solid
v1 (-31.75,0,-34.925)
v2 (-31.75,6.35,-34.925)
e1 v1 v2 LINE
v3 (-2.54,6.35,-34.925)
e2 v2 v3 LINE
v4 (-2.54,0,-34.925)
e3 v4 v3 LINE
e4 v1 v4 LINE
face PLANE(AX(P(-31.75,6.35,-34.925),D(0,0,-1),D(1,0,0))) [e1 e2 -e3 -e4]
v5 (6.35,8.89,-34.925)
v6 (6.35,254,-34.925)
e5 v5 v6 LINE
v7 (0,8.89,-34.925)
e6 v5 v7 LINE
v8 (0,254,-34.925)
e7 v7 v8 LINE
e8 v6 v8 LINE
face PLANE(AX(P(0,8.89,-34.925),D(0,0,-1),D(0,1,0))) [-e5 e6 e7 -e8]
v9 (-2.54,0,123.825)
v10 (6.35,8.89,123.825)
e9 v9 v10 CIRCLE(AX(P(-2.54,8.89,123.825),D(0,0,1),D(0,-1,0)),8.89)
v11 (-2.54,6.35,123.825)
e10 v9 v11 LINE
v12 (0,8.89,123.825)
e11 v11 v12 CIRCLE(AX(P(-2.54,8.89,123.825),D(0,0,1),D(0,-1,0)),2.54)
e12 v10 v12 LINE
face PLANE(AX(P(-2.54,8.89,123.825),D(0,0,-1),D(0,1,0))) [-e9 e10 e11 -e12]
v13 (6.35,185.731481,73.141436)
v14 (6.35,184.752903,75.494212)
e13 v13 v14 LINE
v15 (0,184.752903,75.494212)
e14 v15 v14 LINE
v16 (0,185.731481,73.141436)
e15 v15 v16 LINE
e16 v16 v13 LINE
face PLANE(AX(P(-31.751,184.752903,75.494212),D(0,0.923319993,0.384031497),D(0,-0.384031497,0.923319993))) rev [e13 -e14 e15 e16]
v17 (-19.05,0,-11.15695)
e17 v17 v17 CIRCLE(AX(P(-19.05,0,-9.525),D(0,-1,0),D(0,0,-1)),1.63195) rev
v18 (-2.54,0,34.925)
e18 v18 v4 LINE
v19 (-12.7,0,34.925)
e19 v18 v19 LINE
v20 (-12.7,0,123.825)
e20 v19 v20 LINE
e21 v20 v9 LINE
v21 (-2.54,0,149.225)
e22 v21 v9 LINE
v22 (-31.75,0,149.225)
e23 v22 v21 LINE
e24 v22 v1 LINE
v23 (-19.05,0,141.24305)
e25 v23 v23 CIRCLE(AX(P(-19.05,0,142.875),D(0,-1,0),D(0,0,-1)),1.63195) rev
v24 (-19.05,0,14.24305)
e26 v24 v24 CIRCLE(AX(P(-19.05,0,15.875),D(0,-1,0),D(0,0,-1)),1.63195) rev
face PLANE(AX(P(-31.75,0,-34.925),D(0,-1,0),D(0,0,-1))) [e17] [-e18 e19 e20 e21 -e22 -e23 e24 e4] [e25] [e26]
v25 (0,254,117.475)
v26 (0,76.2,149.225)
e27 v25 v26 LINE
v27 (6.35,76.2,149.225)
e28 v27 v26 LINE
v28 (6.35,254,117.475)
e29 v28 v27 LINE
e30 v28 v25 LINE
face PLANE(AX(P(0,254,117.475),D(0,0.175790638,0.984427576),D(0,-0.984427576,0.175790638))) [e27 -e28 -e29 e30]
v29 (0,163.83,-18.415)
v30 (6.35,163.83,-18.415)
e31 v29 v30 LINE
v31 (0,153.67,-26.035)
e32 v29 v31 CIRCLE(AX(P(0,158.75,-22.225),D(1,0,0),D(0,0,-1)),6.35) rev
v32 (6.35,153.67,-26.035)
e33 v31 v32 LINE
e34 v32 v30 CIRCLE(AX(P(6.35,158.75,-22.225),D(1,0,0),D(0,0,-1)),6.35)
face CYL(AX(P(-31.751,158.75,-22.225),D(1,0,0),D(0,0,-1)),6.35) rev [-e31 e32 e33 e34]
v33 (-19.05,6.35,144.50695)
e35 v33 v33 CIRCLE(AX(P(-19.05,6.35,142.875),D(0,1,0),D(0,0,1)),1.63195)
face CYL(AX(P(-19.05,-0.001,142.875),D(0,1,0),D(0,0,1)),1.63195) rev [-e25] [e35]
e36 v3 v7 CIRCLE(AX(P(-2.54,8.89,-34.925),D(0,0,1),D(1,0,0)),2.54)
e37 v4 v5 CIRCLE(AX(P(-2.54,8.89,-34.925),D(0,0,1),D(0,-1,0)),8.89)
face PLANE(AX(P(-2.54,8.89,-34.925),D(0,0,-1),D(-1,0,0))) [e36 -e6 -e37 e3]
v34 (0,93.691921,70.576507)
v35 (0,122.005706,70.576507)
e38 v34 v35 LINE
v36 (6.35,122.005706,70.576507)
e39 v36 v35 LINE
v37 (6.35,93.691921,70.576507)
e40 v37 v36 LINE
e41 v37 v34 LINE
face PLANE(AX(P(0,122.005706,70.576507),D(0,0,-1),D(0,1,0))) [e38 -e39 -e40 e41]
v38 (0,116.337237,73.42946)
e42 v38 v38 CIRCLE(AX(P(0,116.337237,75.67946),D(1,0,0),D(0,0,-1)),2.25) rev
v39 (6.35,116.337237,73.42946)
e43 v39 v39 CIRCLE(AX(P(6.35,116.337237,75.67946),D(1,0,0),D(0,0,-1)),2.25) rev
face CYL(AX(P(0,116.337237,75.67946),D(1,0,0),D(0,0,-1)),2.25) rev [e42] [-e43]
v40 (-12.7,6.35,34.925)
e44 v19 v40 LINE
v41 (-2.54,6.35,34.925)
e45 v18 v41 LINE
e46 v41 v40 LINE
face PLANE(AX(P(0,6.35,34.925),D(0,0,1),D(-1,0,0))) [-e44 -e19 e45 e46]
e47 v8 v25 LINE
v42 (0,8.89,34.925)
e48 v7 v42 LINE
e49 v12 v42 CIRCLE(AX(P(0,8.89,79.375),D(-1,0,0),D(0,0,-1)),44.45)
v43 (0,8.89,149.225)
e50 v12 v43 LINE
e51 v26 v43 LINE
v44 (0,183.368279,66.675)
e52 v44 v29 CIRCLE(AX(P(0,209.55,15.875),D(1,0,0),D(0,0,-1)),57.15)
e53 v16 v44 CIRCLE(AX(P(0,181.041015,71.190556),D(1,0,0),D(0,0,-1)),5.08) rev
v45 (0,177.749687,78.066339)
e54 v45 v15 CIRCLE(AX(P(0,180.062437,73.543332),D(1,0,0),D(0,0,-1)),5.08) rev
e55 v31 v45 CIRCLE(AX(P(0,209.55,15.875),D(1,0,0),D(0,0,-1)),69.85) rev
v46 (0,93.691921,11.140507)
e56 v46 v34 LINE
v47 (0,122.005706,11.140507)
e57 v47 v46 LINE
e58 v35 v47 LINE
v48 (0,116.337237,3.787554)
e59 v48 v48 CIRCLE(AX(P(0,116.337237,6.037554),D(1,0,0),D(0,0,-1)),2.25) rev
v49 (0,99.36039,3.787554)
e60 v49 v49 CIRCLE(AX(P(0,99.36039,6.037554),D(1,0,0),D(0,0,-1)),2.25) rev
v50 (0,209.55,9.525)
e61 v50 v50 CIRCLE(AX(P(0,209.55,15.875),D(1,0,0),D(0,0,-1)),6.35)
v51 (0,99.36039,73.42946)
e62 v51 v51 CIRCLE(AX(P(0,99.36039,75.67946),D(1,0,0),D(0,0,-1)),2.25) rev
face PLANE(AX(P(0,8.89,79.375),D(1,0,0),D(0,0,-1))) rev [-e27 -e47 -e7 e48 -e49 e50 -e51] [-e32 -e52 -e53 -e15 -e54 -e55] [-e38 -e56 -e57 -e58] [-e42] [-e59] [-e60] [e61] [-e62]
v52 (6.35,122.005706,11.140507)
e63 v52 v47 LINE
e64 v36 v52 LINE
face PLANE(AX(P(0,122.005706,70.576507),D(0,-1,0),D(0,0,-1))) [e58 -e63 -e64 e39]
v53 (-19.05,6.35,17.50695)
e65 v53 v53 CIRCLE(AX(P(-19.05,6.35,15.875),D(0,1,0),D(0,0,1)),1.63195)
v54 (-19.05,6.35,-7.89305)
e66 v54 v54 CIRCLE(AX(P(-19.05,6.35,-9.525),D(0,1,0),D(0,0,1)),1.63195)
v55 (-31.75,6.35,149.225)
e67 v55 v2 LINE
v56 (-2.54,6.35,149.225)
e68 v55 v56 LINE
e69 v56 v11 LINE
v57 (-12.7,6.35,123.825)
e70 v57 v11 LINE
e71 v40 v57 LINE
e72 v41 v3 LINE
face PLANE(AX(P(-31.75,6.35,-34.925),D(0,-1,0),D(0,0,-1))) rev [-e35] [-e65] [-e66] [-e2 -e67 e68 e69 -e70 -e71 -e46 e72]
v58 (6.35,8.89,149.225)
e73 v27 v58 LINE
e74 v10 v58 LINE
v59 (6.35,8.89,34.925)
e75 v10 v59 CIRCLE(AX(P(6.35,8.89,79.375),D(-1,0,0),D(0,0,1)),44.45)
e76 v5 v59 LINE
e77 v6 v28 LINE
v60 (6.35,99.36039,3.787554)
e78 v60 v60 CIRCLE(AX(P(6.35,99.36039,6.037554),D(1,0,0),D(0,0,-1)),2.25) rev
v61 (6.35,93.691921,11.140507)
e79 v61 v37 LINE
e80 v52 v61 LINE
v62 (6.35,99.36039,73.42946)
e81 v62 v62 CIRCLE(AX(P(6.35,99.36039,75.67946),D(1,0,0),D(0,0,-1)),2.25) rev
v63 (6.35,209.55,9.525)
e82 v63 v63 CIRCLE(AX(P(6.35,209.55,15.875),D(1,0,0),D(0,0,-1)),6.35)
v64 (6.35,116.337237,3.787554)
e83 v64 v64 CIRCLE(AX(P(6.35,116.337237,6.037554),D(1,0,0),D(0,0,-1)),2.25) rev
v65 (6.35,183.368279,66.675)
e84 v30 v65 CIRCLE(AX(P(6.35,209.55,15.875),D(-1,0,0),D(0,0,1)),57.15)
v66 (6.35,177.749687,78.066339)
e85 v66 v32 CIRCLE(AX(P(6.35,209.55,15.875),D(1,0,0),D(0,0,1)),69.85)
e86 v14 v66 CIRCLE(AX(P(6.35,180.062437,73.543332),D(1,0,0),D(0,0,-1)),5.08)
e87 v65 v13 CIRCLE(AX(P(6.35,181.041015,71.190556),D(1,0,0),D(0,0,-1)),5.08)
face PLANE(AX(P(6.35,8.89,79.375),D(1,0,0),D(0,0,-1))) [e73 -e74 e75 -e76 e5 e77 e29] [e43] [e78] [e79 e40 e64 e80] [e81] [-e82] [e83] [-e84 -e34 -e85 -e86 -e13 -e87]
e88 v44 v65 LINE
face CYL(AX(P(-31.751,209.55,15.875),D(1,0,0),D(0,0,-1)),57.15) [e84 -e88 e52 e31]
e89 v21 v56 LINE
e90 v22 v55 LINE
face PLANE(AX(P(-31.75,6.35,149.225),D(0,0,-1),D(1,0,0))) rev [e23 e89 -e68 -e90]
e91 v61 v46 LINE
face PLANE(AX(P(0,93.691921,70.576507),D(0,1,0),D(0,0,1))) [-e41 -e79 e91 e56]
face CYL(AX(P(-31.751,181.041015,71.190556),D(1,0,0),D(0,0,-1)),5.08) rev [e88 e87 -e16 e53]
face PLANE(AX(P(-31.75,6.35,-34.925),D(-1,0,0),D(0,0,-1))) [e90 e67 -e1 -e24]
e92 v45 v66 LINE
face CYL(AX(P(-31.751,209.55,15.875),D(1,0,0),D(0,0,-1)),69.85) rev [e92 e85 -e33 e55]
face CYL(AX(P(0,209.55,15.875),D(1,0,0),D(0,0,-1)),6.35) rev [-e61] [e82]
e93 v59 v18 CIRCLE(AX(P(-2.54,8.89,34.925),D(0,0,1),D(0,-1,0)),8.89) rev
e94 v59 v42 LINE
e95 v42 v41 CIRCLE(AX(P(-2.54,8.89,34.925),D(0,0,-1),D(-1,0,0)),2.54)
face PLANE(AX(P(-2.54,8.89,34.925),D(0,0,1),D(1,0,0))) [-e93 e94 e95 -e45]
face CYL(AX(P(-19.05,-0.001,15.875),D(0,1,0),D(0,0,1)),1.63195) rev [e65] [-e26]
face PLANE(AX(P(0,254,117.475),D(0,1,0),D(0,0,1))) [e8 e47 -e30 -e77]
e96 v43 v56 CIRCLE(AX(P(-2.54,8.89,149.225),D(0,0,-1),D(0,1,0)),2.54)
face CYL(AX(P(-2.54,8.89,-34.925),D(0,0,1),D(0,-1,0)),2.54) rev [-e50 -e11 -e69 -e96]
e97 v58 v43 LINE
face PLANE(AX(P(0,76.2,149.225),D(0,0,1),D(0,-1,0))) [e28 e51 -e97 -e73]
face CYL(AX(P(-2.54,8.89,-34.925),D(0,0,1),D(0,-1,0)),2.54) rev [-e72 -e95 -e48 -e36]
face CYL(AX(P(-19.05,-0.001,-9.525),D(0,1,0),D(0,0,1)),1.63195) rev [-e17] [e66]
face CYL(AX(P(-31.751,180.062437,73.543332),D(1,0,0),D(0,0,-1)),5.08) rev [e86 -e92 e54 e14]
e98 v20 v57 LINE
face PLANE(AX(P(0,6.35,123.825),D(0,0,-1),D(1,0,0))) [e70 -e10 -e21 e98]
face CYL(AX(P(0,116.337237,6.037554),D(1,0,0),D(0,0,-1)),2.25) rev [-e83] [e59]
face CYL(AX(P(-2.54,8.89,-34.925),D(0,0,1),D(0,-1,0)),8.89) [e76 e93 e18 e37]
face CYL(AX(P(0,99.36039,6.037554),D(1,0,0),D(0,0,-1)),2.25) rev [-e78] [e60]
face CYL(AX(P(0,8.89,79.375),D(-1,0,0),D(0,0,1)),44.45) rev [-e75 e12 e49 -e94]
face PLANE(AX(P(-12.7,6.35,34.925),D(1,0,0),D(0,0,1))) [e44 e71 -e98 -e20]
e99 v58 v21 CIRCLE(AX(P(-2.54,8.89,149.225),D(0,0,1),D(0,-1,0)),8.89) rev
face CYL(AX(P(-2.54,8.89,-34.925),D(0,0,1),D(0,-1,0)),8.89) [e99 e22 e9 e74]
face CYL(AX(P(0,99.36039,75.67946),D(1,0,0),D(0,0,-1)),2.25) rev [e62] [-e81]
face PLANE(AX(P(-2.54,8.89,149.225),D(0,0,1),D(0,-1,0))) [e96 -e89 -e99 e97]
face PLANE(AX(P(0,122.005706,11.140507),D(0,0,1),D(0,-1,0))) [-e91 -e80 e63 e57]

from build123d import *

# Parameters (mm, degrees)
BOSS_EXTRUDE1_DEPTH  = 6.35
SKETCH5_W            = 184.15
SKETCH5_H            = 6.35
BOSS_EXTRUDE4_DEPTH  = 31.75
SKETCH6_W            = 12.7
SKETCH6_H            = 88.9
CUT_EXTRUDE2_DEPTH   = 291.872284044
CUT_EXTRUDE3_REACH   = 299.045
SKETCH7_R            = 2.25
SKETCH7_W            = 59.436
SKETCH7_H            = 28.313784743
SKETCH8_R            = 6.35
CUT_EXTRUDE4_DEPTH   = 298.044963979
FILLET1_R            = 2.54
CONVERT_SOLID1_START = -34.925
CONVERT_SOLID1_DEPTH = 184.15
CUT_EXTRUDE5_REACH   = 299.045
CUT_EXTRUDE6_REACH   = 292.872
SKETCH10_R           = 1.63195


# Read off the part's stored shape, not the designer's step: Convert-Solid1
with BuildPart() as part:
    # Sketch1 → Boss-Extrude1 (new body)
    with BuildSketch(Plane(origin=(0, 0, 0), x_dir=(0, 0, -1), z_dir=(1, 0, 0))):
        with BuildLine():
            Line((-117.475, 254), (34.925, 254))
            Line((34.925, 254), (34.925, 8.89))
            Line((34.925, 8.89), (34.925, 0))
            Line((34.925, 0), (-34.925, 0))
            Line((-34.925, 0), (-34.925, 8.89))
            ThreePointArc((-34.925, 8.89), (-79.375, 53.34), (-123.825, 8.89))
            Line((-123.825, 8.89), (-123.825, 0))
            Line((-123.825, 0), (-149.225, 0))
            Line((-149.225, 0), (-149.225, 76.2))
            Line((-149.225, 76.2), (-117.475, 254))
        make_face()
    extrude(amount=BOSS_EXTRUDE1_DEPTH)

    # Sketch5 → Boss-Extrude4 (add)
    with BuildSketch(Plane.ZY):
        with Locations((57.15, 3.175)):
            Rectangle(SKETCH5_W, SKETCH5_H)
    extrude(amount=BOSS_EXTRUDE4_DEPTH)

    # Sketch6 → Cut-Extrude2 (cut, through all)
    with BuildSketch(Plane(origin=(0, 6.35, 0), x_dir=(1, 0, 0), z_dir=(0, 1, 0))):
        with Locations((-6.35, -79.375)):
            Rectangle(SKETCH6_W, SKETCH6_H)
    extrude(amount=-CUT_EXTRUDE2_DEPTH, mode=Mode.SUBTRACT)

    # Sketch7 → Cut-Extrude3 (cut, up to next)
    with BuildSketch(Plane(origin=(6.35, 0, 0), x_dir=(0, 0, -1), z_dir=(1, 0, 0)), mode=Mode.PRIVATE) as cut_extrude3_sk1:
        with Locations((-75.679460058, 116.337237118)):
            Circle(SKETCH7_R)
    cut_extrude3_tool1 = extrude(cut_extrude3_sk1.sketch, amount=-CUT_EXTRUDE3_REACH, mode=Mode.PRIVATE) & part.part
    # Sketch7 → Cut-Extrude3 (cut, up to next)
    with BuildSketch(Plane(origin=(6.35, 0, 0), x_dir=(0, 0, -1), z_dir=(1, 0, 0)), mode=Mode.PRIVATE) as cut_extrude3_sk2:
        with Locations((-75.679460058, 99.360389657)):
            Circle(SKETCH7_R)
    cut_extrude3_tool2 = extrude(cut_extrude3_sk2.sketch, amount=-CUT_EXTRUDE3_REACH, mode=Mode.PRIVATE) & part.part
    # Sketch7 → Cut-Extrude3 (cut, up to next)
    with BuildSketch(Plane(origin=(6.35, 0, 0), x_dir=(0, 0, -1), z_dir=(1, 0, 0)), mode=Mode.PRIVATE) as cut_extrude3_sk3:
        with Locations((-6.03755368, 99.360389657)):
            Circle(SKETCH7_R)
    cut_extrude3_tool3 = extrude(cut_extrude3_sk3.sketch, amount=-CUT_EXTRUDE3_REACH, mode=Mode.PRIVATE) & part.part
    # Sketch7 → Cut-Extrude3 (cut, up to next)
    with BuildSketch(Plane(origin=(6.35, 0, 0), x_dir=(0, 0, -1), z_dir=(1, 0, 0)), mode=Mode.PRIVATE) as cut_extrude3_sk4:
        with Locations((-6.03755368, 116.337237118)):
            Circle(SKETCH7_R)
    cut_extrude3_tool4 = extrude(cut_extrude3_sk4.sketch, amount=-CUT_EXTRUDE3_REACH, mode=Mode.PRIVATE) & part.part
    # Sketch7 → Cut-Extrude3 (cut, up to next)
    with BuildSketch(Plane(origin=(6.35, 0, 0), x_dir=(0, 0, -1), z_dir=(1, 0, 0)), mode=Mode.PRIVATE) as cut_extrude3_sk5:
        with Locations((-40.858506869, 107.848813388)):
            Rectangle(SKETCH7_W, SKETCH7_H)
    cut_extrude3_tool5 = extrude(cut_extrude3_sk5.sketch, amount=-CUT_EXTRUDE3_REACH, mode=Mode.PRIVATE) & part.part
    add(cut_extrude3_tool1.solids().sort_by_distance((6.35, 116.337237, 75.67946))[0], mode=Mode.SUBTRACT)
    add(cut_extrude3_tool2.solids().sort_by_distance((6.35, 99.36039, 75.67946))[0], mode=Mode.SUBTRACT)
    add(cut_extrude3_tool3.solids().sort_by_distance((6.35, 99.36039, 6.037554))[0], mode=Mode.SUBTRACT)
    add(cut_extrude3_tool4.solids().sort_by_distance((6.35, 116.337237, 6.037554))[0], mode=Mode.SUBTRACT)
    add(cut_extrude3_tool5.solids().sort_by_distance((6.35, 107.848813, 40.858507))[0], mode=Mode.SUBTRACT)

    # Sketch8 → Cut-Extrude4 (cut, through all)
    with BuildSketch(Plane(origin=(6.35, 0, 0), x_dir=(0, 0, -1), z_dir=(1, 0, 0))):
        with Locations((-15.875, 209.55)):
            Circle(SKETCH8_R)
    extrude(amount=-CUT_EXTRUDE4_DEPTH, mode=Mode.SUBTRACT)

    # Fillet1
    fillet1_edges = [part.edges().sort_by_distance(p)[0] for p in [
        (0, 6.35, 136.525),
        (0, 6.35, 0),
    ]]
    fillet(fillet1_edges, radius=FILLET1_R)

    # Convert-Solid1 outline → Convert-Solid1 (cut)
    with BuildSketch(Plane.XY.offset(CONVERT_SOLID1_START)):
        with BuildLine():
            ThreePointArc((6.35, 8.89), (3.746179285, 2.603820715), (-2.54, 0))
            Line((-2.54, 0), (6.35, 0))
            Line((6.35, 0), (6.35, 8.89))
        make_face()
    extrude(amount=CONVERT_SOLID1_DEPTH, mode=Mode.SUBTRACT)

    # Sketch9 → Cut-Extrude5 (cut, up to next)
    with BuildSketch(Plane(origin=(6.35, 0, 0), x_dir=(0, 0, -1), z_dir=(1, 0, 0)), mode=Mode.PRIVATE) as cut_extrude5_sk1:
        with BuildLine():
            Line((-75.494212356, 184.752903033), (-73.141435562, 185.731480776))
            ThreePointArc((-73.141435562, 185.731480776), (-69.446832384, 185.812370314), (-66.675, 183.368279277))
            ThreePointArc((-66.675, 183.368279277), (-28.664883279, 153.84953873), (18.415, 163.83))
            ThreePointArc((18.415, 163.83), (27.305, 162.56), (26.035, 153.67))
            ThreePointArc((26.035, 153.67), (-31.616379009, 141.496848075), (-78.066338809, 177.749687467))
            ThreePointArc((-78.066338809, 177.749687467), (-78.311881244, 181.813820193), (-75.494212356, 184.752903033))
        make_face()
    cut_extrude5_tool1 = extrude(cut_extrude5_sk1.sketch, amount=-CUT_EXTRUDE5_REACH, mode=Mode.PRIVATE) & part.part
    add(cut_extrude5_tool1.solids().sort_by_distance((6.35, 181.411079, 77.215324))[0], mode=Mode.SUBTRACT)

    # Sketch10 → Cut-Extrude6 (cut, up to next)
    with BuildSketch(Plane(origin=(0, 6.35, 0), x_dir=(1, 0, 0), z_dir=(0, 1, 0)), mode=Mode.PRIVATE) as cut_extrude6_sk1:
        with Locations(Location((-19.05, 9.525, 0), (0, 0, 270))):
            Circle(SKETCH10_R)
    cut_extrude6_tool1 = extrude(cut_extrude6_sk1.sketch, amount=-CUT_EXTRUDE6_REACH, mode=Mode.PRIVATE) & part.part
    # Sketch10 → Cut-Extrude6 (cut, up to next)
    with BuildSketch(Plane(origin=(0, 6.35, 0), x_dir=(1, 0, 0), z_dir=(0, 1, 0)), mode=Mode.PRIVATE) as cut_extrude6_sk2:
        with Locations(Location((-19.05, -15.875, 0), (0, 0, 270))):
            Circle(SKETCH10_R)
    cut_extrude6_tool2 = extrude(cut_extrude6_sk2.sketch, amount=-CUT_EXTRUDE6_REACH, mode=Mode.PRIVATE) & part.part
    # Sketch10 → Cut-Extrude6 (cut, up to next)
    with BuildSketch(Plane(origin=(0, 6.35, 0), x_dir=(1, 0, 0), z_dir=(0, 1, 0)), mode=Mode.PRIVATE) as cut_extrude6_sk3:
        with Locations(Location((-19.05, -142.875, 0), (0, 0, 270))):
            Circle(SKETCH10_R)
    cut_extrude6_tool3 = extrude(cut_extrude6_sk3.sketch, amount=-CUT_EXTRUDE6_REACH, mode=Mode.PRIVATE) & part.part
    add(cut_extrude6_tool1.solids().sort_by_distance((-19.05, 6.35, -9.525))[0], mode=Mode.SUBTRACT)
    add(cut_extrude6_tool2.solids().sort_by_distance((-19.05, 6.35, 15.875))[0], mode=Mode.SUBTRACT)
    add(cut_extrude6_tool3.solids().sort_by_distance((-19.05, 6.35, 142.875))[0], mode=Mode.SUBTRACT)


solid = part.part
